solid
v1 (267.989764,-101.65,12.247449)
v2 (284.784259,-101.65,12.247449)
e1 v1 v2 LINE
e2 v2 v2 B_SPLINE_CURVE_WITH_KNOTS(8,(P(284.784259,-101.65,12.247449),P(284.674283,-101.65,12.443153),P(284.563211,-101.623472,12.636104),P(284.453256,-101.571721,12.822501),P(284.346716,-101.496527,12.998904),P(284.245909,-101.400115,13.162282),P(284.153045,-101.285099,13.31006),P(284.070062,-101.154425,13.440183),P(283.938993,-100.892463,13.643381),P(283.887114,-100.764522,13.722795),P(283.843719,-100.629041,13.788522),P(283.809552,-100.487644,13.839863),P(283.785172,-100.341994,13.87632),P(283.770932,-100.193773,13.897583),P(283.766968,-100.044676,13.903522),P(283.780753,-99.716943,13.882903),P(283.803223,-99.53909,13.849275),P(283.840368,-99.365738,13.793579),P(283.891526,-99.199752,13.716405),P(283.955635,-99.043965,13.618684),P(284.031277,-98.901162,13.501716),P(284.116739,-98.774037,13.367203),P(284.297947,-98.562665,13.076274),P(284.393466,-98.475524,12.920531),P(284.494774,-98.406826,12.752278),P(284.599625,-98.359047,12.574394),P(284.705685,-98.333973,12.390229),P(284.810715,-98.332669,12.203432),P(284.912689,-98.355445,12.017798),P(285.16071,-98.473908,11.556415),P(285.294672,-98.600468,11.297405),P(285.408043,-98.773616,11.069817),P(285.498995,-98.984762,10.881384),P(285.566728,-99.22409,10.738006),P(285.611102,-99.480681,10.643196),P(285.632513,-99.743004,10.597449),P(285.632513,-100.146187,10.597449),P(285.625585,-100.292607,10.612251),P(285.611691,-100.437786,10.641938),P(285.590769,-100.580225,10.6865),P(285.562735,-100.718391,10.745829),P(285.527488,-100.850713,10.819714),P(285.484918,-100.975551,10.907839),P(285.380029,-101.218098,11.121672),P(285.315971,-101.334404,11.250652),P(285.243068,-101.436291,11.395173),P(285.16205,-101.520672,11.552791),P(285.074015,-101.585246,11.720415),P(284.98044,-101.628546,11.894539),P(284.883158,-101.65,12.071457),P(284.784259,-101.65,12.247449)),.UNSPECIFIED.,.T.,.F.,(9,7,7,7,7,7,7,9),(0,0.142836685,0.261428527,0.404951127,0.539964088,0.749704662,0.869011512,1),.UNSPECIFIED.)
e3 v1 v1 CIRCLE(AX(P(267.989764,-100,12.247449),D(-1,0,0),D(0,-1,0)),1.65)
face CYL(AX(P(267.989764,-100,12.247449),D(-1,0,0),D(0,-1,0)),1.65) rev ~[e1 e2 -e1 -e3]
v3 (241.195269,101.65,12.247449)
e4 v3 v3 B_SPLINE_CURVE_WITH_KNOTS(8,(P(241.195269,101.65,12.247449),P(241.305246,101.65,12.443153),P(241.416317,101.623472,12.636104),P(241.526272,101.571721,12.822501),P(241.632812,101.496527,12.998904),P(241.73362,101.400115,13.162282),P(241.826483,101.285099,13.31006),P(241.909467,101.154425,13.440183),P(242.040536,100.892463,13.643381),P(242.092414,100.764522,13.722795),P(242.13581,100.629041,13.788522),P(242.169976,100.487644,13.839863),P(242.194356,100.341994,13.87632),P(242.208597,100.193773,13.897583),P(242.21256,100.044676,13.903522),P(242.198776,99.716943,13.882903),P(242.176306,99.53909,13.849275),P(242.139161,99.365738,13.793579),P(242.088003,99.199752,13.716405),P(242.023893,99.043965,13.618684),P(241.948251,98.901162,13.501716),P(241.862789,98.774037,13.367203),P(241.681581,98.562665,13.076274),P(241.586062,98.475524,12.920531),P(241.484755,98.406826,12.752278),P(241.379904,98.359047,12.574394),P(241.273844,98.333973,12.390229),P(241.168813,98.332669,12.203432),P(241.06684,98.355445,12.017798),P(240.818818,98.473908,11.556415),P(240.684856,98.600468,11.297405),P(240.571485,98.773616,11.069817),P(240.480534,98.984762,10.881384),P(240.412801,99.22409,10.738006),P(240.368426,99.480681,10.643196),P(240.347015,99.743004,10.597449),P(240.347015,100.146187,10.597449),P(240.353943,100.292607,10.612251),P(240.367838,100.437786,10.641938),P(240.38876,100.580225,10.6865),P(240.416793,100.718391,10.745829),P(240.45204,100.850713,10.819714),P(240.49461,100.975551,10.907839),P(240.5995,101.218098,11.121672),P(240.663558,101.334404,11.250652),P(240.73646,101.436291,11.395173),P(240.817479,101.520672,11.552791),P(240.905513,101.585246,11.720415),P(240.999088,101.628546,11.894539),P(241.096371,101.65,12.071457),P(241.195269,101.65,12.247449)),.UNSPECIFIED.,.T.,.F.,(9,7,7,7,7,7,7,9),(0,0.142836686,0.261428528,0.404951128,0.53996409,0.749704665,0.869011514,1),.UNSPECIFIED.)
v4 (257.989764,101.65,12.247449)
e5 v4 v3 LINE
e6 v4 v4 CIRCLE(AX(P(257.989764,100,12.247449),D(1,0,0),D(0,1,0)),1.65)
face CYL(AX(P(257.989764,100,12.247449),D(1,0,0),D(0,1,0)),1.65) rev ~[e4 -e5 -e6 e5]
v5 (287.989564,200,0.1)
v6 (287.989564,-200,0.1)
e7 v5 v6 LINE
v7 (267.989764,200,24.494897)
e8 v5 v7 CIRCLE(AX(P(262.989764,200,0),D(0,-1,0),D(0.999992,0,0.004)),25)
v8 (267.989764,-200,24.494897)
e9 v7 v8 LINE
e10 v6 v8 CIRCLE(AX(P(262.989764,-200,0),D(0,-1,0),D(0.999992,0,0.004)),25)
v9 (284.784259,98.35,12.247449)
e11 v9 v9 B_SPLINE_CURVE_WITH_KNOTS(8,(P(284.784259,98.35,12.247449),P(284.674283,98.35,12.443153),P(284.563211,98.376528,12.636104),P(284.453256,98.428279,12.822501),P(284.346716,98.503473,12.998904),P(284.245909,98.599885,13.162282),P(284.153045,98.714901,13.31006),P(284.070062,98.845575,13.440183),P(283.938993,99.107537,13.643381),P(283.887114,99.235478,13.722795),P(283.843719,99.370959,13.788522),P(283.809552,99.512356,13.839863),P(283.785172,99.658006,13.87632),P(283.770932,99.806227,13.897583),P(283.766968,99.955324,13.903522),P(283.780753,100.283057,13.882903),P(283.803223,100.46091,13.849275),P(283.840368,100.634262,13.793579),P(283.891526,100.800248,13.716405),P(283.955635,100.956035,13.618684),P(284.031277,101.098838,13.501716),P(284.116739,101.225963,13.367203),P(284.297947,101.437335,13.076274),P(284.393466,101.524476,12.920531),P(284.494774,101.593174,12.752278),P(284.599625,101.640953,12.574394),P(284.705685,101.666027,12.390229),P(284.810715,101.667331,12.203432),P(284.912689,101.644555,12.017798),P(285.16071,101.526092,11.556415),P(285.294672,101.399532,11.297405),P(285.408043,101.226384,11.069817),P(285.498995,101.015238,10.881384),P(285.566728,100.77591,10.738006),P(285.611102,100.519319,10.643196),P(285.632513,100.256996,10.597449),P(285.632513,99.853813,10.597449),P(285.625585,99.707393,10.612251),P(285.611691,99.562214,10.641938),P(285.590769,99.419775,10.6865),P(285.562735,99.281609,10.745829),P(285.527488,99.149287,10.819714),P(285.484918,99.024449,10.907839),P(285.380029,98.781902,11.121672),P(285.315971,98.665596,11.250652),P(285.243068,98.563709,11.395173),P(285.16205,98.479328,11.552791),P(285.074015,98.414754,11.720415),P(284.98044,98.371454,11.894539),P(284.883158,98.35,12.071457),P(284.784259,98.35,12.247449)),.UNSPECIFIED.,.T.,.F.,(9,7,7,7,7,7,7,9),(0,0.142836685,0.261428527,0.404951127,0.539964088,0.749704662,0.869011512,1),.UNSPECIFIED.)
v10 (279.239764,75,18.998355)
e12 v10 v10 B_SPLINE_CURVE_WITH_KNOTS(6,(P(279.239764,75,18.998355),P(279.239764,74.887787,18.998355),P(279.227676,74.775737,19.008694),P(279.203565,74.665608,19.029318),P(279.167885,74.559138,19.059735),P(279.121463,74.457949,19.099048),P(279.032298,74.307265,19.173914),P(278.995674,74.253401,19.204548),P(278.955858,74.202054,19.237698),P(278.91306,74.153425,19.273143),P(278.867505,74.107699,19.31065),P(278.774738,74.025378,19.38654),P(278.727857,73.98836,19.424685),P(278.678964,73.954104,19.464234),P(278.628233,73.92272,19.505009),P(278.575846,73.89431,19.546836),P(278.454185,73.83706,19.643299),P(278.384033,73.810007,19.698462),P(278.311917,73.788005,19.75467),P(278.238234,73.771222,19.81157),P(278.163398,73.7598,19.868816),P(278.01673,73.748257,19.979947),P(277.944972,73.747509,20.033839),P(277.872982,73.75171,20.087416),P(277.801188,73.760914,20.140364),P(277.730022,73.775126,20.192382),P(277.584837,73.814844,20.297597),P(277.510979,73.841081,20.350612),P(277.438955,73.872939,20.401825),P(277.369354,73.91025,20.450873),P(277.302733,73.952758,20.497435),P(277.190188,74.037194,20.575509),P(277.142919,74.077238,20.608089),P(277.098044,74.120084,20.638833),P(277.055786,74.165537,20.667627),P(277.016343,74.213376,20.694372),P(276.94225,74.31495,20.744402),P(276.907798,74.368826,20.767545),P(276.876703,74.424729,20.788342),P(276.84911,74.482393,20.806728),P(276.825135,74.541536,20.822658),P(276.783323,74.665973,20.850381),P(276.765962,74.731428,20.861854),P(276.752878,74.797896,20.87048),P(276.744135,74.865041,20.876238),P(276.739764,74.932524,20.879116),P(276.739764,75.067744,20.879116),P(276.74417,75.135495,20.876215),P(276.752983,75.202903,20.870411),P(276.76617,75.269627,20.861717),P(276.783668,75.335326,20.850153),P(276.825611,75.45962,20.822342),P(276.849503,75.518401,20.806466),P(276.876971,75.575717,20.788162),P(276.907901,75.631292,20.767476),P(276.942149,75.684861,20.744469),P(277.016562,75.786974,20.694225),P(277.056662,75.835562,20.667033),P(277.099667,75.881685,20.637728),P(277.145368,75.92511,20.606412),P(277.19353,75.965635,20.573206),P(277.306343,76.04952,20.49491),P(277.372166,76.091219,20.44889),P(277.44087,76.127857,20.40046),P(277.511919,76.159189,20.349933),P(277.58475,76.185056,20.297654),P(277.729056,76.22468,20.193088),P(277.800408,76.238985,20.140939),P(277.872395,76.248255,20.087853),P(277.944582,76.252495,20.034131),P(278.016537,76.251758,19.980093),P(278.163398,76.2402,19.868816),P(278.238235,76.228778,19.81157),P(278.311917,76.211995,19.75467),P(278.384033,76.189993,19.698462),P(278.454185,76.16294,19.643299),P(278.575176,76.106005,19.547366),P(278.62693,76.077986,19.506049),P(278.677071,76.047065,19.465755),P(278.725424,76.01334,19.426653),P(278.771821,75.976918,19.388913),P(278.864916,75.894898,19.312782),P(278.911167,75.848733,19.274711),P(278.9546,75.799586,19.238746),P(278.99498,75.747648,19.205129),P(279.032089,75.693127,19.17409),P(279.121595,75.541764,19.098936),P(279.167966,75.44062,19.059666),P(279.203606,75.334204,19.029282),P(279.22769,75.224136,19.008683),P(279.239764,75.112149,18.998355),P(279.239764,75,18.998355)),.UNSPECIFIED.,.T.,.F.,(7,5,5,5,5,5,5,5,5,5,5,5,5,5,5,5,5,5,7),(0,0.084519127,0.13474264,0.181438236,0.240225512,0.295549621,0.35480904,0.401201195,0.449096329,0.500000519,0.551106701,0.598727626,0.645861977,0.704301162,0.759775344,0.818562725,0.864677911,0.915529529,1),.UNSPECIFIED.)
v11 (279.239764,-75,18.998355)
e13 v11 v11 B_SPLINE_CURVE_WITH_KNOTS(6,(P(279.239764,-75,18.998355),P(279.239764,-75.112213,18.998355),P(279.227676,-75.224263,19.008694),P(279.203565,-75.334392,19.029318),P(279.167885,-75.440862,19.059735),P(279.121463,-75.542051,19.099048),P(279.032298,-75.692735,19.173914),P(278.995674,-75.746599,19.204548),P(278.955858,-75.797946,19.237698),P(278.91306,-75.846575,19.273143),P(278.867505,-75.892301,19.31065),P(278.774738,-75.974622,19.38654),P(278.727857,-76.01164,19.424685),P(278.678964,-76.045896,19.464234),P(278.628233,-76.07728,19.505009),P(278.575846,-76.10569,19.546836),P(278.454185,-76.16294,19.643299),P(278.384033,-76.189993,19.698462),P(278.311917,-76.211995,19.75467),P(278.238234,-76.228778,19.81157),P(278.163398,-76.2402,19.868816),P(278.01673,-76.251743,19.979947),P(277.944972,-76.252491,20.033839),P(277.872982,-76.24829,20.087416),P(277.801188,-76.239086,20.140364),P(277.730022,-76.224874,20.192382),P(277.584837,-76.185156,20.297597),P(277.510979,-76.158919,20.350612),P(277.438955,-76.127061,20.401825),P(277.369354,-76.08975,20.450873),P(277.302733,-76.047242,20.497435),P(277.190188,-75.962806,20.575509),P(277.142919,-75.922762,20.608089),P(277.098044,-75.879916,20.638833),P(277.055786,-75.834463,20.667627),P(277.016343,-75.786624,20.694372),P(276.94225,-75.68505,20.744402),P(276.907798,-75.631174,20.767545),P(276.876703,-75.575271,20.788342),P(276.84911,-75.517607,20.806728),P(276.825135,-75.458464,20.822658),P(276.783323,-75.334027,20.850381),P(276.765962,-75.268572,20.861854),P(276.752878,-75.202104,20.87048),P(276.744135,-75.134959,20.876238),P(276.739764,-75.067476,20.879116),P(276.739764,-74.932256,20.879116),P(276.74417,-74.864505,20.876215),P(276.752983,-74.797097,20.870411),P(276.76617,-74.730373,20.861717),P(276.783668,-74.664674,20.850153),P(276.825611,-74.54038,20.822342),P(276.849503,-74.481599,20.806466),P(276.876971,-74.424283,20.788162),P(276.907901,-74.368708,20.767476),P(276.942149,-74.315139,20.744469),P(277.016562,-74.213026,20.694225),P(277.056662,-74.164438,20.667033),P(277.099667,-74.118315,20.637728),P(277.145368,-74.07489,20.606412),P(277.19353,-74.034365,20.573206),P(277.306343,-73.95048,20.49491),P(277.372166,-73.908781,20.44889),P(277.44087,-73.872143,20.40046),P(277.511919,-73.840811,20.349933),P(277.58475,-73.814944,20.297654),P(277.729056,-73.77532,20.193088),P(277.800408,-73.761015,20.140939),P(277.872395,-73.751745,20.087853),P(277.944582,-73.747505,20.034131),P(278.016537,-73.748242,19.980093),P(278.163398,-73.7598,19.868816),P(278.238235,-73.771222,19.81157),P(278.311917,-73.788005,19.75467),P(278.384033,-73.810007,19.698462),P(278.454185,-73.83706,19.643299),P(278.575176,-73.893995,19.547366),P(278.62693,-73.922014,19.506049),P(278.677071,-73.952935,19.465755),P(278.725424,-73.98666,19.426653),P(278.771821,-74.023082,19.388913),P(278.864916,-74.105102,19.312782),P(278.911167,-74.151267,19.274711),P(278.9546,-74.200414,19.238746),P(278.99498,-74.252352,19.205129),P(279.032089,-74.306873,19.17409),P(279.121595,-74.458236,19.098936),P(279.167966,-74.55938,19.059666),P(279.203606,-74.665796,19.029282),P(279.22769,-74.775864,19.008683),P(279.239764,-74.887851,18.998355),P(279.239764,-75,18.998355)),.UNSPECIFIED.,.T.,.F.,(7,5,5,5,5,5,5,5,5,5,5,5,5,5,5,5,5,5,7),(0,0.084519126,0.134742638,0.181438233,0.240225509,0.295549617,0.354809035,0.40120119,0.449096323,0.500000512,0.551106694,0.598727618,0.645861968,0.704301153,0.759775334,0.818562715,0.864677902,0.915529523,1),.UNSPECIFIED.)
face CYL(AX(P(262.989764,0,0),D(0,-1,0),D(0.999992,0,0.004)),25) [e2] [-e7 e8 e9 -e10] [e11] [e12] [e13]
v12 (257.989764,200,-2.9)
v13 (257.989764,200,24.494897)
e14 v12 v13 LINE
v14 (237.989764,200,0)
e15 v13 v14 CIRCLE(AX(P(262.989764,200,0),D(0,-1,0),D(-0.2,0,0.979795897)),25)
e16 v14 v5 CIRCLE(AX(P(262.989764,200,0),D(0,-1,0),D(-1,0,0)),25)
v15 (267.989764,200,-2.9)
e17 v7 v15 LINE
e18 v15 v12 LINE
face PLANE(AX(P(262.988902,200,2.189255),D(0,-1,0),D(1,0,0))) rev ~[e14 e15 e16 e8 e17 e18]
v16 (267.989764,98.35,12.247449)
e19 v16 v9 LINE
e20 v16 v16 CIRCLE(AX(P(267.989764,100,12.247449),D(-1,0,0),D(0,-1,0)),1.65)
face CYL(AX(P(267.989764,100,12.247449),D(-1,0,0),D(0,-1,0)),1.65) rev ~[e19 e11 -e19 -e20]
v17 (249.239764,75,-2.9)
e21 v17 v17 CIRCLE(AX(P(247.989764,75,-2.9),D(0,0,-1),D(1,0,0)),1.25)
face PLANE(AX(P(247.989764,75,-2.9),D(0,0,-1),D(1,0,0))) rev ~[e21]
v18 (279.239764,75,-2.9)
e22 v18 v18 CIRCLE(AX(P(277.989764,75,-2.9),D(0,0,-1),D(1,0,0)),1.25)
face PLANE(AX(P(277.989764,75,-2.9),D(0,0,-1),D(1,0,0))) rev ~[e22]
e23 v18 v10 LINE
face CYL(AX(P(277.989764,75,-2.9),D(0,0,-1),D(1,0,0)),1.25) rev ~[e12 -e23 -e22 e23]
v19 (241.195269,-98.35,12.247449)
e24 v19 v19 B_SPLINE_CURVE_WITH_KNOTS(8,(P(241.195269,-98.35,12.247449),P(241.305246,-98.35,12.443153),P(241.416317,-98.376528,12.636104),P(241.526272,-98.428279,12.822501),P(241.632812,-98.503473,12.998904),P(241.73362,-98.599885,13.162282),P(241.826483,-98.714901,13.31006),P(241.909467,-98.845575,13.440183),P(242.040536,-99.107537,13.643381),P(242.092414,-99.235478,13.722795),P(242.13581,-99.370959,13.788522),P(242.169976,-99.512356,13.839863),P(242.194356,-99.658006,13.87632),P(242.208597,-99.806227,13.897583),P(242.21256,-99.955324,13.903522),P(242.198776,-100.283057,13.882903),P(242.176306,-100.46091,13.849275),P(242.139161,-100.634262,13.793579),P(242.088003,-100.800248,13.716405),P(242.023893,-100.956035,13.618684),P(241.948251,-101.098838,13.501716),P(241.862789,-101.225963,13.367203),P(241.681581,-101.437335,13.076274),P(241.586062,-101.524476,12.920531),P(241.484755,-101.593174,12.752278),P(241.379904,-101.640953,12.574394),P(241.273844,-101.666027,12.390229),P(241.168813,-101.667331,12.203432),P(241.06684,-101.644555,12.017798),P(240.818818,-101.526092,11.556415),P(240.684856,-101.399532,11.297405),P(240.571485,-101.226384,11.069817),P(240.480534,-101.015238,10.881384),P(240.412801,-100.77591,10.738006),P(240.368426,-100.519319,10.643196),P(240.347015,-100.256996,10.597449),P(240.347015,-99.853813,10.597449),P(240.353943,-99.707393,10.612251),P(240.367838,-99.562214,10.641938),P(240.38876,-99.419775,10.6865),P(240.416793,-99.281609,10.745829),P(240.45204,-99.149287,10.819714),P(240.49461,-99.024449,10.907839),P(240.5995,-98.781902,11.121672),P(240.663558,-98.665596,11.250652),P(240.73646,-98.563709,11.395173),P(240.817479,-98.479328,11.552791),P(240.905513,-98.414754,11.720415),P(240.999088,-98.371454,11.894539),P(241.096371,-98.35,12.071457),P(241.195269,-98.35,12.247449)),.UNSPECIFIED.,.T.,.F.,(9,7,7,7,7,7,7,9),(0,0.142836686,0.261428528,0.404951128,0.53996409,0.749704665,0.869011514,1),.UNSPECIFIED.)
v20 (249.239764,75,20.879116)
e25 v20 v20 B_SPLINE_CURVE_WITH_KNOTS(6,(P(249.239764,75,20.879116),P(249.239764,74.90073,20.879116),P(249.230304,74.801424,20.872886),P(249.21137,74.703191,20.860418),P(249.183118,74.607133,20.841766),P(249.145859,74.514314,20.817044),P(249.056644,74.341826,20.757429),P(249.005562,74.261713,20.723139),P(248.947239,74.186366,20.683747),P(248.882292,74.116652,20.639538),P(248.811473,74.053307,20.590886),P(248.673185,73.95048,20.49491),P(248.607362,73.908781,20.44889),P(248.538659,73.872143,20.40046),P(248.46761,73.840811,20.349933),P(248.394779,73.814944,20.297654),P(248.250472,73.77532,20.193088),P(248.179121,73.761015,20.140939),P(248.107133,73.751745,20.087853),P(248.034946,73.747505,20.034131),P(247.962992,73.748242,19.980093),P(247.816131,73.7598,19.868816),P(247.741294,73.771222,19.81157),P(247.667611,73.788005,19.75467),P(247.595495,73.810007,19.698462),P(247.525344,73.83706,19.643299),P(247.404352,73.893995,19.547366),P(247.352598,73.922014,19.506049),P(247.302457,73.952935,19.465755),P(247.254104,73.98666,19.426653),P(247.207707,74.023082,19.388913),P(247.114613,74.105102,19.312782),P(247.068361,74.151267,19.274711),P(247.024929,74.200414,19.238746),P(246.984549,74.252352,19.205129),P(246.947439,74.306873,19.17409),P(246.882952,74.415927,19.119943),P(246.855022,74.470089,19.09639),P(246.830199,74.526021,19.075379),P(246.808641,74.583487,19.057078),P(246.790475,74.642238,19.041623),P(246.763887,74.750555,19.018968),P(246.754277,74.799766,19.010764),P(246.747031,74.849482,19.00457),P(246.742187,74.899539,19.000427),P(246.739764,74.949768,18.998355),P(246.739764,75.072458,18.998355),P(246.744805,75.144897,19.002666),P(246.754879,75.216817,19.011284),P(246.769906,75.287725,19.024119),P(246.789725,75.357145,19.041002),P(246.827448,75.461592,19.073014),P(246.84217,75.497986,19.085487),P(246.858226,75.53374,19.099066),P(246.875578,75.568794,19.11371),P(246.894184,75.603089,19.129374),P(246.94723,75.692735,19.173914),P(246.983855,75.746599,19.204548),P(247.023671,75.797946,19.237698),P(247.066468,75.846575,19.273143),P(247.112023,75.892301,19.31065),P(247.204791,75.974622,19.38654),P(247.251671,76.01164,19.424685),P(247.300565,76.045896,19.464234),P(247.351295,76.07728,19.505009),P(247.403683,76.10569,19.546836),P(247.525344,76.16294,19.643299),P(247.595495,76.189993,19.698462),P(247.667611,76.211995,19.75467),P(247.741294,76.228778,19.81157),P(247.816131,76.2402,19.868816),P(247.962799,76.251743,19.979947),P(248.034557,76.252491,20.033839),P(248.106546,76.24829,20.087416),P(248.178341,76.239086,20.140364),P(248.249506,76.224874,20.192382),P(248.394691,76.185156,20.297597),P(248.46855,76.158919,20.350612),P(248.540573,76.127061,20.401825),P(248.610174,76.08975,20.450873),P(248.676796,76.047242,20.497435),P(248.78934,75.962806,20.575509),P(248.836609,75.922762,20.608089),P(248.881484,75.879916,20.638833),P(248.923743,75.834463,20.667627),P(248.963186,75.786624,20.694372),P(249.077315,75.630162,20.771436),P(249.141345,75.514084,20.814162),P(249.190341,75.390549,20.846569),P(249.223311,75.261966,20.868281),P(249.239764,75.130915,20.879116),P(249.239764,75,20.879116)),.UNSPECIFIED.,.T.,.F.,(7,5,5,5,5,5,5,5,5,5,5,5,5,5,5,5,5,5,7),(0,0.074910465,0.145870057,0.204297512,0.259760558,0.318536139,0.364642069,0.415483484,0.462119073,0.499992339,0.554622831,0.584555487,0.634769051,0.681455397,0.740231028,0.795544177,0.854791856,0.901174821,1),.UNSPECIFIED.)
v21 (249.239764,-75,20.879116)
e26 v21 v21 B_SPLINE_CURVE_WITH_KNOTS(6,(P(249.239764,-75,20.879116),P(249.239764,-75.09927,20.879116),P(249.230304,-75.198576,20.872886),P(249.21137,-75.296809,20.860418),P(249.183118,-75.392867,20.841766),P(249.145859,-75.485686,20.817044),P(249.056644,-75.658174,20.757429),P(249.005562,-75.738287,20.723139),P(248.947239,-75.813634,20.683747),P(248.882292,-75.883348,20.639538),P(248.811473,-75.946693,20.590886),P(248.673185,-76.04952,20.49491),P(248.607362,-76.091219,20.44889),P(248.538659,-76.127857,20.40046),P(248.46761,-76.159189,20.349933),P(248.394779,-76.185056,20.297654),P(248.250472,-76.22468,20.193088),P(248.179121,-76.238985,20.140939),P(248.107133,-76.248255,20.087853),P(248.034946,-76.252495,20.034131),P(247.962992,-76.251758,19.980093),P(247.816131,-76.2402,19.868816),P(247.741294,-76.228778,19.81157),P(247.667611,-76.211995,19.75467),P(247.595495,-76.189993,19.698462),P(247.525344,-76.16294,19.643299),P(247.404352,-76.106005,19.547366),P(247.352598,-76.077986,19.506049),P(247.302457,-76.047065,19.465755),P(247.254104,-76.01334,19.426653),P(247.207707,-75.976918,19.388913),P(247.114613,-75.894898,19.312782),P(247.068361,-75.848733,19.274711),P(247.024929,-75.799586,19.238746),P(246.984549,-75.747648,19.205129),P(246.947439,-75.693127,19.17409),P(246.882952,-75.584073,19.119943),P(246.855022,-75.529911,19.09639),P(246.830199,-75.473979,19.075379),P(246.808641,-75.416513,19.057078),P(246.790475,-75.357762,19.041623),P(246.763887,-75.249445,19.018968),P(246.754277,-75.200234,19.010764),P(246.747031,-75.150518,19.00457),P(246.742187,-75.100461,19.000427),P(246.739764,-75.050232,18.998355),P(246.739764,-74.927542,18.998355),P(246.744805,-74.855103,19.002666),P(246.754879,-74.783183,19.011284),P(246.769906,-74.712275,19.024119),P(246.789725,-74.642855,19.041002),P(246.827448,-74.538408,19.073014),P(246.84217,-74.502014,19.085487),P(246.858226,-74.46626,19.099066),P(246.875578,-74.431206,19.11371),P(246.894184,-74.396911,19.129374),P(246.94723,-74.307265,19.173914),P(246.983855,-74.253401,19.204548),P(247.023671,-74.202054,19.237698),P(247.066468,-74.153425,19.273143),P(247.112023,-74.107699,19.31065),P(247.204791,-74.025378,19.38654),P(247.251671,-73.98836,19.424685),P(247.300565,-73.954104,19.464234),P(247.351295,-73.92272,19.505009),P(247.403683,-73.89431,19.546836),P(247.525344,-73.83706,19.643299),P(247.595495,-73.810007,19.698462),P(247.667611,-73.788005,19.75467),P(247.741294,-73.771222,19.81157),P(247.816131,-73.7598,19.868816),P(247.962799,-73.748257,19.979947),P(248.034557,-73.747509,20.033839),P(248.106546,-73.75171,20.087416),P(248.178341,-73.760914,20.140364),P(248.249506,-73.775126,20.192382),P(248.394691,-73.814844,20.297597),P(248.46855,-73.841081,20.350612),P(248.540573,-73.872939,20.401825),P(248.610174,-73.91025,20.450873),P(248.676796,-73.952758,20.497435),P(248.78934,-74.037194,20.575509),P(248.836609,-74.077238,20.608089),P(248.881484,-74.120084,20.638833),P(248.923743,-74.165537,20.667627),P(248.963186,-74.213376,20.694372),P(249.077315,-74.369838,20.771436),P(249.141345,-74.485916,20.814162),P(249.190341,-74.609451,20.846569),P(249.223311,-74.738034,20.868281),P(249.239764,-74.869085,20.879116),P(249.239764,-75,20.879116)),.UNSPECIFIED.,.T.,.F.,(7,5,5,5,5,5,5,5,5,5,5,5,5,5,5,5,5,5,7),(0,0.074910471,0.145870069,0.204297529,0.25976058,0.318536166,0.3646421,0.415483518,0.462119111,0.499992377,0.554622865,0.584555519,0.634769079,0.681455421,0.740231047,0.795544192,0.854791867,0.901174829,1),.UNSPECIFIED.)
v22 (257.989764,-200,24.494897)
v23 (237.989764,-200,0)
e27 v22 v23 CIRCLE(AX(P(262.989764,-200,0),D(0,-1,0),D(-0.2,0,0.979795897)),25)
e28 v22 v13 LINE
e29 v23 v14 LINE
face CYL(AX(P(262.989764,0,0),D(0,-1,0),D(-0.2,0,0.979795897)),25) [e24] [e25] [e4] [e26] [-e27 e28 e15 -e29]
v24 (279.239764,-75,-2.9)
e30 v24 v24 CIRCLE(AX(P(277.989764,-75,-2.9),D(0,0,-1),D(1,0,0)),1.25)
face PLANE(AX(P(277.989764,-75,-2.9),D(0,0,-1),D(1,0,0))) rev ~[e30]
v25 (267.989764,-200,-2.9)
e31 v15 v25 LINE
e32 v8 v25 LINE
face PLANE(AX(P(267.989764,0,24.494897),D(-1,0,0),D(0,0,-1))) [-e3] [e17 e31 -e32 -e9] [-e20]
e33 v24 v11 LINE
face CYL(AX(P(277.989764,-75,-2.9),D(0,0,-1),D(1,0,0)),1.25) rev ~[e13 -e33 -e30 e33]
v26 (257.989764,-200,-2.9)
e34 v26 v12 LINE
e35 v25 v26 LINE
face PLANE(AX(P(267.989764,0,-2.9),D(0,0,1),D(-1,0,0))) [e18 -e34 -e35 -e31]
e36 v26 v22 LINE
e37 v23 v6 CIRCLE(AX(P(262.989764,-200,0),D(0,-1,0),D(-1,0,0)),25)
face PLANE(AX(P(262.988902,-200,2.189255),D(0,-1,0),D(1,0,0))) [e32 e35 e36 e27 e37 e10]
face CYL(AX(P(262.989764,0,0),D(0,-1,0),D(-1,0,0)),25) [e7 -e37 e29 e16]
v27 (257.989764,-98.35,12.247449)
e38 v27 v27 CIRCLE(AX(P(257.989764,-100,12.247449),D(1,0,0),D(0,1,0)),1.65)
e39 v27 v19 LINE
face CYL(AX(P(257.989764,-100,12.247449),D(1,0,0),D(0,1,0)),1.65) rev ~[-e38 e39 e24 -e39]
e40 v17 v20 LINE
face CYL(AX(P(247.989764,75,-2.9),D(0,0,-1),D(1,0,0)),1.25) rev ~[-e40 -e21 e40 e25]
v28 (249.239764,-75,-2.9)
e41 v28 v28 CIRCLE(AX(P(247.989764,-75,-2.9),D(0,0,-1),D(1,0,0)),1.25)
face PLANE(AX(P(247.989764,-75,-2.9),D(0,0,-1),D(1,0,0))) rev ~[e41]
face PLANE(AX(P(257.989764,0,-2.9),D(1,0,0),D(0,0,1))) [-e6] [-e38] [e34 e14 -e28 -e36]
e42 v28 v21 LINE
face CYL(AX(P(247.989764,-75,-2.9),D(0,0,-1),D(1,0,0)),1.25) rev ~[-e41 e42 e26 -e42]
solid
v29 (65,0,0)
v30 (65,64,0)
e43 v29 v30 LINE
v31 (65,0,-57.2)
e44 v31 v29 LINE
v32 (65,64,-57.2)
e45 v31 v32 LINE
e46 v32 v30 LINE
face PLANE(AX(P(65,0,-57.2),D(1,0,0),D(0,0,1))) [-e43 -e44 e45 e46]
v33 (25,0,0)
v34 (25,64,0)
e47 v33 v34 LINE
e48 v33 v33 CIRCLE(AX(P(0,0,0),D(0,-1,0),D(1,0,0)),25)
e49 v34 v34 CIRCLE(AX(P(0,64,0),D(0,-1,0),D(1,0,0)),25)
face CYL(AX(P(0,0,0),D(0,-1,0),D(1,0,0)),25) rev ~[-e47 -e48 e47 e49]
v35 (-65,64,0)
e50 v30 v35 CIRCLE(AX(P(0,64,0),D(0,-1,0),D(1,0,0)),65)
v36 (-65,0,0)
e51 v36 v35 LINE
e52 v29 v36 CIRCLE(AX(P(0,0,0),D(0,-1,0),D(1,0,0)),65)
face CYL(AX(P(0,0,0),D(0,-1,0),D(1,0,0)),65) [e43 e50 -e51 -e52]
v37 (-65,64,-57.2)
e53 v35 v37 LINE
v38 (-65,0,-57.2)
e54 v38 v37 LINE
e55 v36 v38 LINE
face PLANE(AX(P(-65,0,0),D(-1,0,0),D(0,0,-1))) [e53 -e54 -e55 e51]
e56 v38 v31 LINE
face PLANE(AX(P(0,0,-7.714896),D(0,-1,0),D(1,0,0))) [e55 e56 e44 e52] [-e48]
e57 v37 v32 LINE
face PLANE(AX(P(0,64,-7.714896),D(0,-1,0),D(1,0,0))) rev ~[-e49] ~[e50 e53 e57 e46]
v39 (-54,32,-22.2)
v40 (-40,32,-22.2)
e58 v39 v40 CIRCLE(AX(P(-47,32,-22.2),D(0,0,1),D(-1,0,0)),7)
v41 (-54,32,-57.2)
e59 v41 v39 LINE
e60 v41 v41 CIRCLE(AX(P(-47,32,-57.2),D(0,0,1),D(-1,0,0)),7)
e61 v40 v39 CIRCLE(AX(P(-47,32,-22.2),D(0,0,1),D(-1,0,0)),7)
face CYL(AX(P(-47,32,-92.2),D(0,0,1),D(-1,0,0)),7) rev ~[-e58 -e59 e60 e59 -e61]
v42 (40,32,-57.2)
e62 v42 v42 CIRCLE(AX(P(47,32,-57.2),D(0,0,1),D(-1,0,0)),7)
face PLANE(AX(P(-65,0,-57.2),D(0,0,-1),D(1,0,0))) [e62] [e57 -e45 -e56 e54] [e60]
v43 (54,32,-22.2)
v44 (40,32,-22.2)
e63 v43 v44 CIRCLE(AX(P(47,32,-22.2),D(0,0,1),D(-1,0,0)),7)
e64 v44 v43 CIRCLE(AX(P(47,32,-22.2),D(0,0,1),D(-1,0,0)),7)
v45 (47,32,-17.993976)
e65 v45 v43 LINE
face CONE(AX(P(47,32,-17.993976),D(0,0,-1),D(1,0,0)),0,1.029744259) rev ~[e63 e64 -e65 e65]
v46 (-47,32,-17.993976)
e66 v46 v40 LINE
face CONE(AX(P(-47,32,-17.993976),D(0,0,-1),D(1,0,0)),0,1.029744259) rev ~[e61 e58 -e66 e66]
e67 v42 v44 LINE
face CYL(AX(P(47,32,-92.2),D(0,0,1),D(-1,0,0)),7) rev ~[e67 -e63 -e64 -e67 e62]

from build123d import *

# Parameters (mm, degrees)
F0_R           = 25
F1_DEPTH       = 64
F3_DEPTH       = 200
F6_D           = 3.3
F6_DEPTH       = 20.001
F6_ON_F5_D     = 3.3
F6_ON_F5_DEPTH = 20.001
F8_D           = 2.5
F8_DEPTH       = 25
F8_TIP         = 0.7510757738
F10_D          = 14
F10_DEPTH      = 35
F10_TIP        = 4.2060243332


# Not quite as in the source:
# - a feature names something its author has since deleted; it is built from what else it names


with BuildPart() as f1:
    # F0 (on Front) → F1 (new body)
    with BuildSketch(Plane.XZ):
        with BuildLine():
            Line((65, -57.2), (65, 0))
            ThreePointArc((65, 0), (0, 65), (-65, 0))
            Line((-65, 0), (-65, -57.2))
            Line((-65, -57.2), (0, -57.2))
            Line((0, -57.2), (65, -57.2))
        make_face()
        Circle(F0_R, mode=Mode.SUBTRACT)
    extrude(amount=-F1_DEPTH)

    # F10
    with Locations(Plane(origin=(0, 0, -57.2), x_dir=(1, 0, 0), z_dir=(0, 0, -1))):
        with Locations((-47, -32), (47, -32)):
            Hole(F10_D / 2, depth=F10_DEPTH)
            with Locations((0, 0, -(F10_DEPTH + F10_TIP / 2))):  # 118° drill point
                Cone(0, F10_D / 2, F10_TIP, mode=Mode.SUBTRACT)


with BuildPart() as f3:
    # F2 (on Front) → F3 (new body, symmetric)
    with BuildSketch(Plane.XZ):
        with BuildLine():
            ThreePointArc((237.9897642136, 0), (263.0397643136, -24.9999499997), (287.9895642128, 0.1))
            ThreePointArc((287.9895642128, 0.1), (282.3230193747, 15.8500865888), (267.9897642136, 24.4948974278))
            Line((267.9897642136, 24.4948974278), (267.9897642136, -2.9))
            Line((267.9897642136, -2.9), (257.9897642136, -2.9))
            Line((257.9897642136, -2.9), (257.9897642136, 24.4948974278))
            ThreePointArc((257.9897642136, 24.4948974278), (243.6248474825, 15.8113883008), (237.9897642136, 0))
        make_face()
    extrude(amount=F3_DEPTH, both=True)

    # F6 (through all, one way)
    with BuildSketch(Plane.YZ.offset(257.9897642136)):
        with Locations((100, 12.2474487139), (-100, 12.2474487139)):
            Circle(F6_D / 2)
    extrude(amount=-F6_DEPTH, mode=Mode.SUBTRACT)

    # F6 on F5 (through all, one way)
    with BuildSketch(Plane(origin=(267.9897642136, 0, 0), x_dir=(0, -1, 0), z_dir=(-1, 0, 0))):
        with Locations((-100, 12.2474487139), (100, 12.2474487139)):
            Circle(F6_ON_F5_D / 2)
    extrude(amount=-F6_ON_F5_DEPTH, mode=Mode.SUBTRACT)

    # F8 (one way)
    with BuildSketch(Plane(origin=(0, 0, -2.9), x_dir=(1, 0, 0), z_dir=(0, 0, -1))):
        with Locations((247.9897642136, 75), (277.9897642136, 75), (277.9897642136, -75), (247.9897642136, -75)):
            Circle(F8_D / 2)
    extrude(amount=-F8_DEPTH, mode=Mode.SUBTRACT)
    with Locations(Plane(origin=(0, 0, -2.9), x_dir=(1, 0, 0), z_dir=(0, 0, -1))):
        with Locations((247.9897642136, 75), (277.9897642136, 75), (277.9897642136, -75), (247.9897642136, -75)):
            with Locations((0, 0, -(F8_DEPTH + F8_TIP / 2))):  # 118° drill point
                Cone(0, F8_D / 2, F8_TIP, mode=Mode.SUBTRACT)


solid = Compound([f1.part, f3.part])
